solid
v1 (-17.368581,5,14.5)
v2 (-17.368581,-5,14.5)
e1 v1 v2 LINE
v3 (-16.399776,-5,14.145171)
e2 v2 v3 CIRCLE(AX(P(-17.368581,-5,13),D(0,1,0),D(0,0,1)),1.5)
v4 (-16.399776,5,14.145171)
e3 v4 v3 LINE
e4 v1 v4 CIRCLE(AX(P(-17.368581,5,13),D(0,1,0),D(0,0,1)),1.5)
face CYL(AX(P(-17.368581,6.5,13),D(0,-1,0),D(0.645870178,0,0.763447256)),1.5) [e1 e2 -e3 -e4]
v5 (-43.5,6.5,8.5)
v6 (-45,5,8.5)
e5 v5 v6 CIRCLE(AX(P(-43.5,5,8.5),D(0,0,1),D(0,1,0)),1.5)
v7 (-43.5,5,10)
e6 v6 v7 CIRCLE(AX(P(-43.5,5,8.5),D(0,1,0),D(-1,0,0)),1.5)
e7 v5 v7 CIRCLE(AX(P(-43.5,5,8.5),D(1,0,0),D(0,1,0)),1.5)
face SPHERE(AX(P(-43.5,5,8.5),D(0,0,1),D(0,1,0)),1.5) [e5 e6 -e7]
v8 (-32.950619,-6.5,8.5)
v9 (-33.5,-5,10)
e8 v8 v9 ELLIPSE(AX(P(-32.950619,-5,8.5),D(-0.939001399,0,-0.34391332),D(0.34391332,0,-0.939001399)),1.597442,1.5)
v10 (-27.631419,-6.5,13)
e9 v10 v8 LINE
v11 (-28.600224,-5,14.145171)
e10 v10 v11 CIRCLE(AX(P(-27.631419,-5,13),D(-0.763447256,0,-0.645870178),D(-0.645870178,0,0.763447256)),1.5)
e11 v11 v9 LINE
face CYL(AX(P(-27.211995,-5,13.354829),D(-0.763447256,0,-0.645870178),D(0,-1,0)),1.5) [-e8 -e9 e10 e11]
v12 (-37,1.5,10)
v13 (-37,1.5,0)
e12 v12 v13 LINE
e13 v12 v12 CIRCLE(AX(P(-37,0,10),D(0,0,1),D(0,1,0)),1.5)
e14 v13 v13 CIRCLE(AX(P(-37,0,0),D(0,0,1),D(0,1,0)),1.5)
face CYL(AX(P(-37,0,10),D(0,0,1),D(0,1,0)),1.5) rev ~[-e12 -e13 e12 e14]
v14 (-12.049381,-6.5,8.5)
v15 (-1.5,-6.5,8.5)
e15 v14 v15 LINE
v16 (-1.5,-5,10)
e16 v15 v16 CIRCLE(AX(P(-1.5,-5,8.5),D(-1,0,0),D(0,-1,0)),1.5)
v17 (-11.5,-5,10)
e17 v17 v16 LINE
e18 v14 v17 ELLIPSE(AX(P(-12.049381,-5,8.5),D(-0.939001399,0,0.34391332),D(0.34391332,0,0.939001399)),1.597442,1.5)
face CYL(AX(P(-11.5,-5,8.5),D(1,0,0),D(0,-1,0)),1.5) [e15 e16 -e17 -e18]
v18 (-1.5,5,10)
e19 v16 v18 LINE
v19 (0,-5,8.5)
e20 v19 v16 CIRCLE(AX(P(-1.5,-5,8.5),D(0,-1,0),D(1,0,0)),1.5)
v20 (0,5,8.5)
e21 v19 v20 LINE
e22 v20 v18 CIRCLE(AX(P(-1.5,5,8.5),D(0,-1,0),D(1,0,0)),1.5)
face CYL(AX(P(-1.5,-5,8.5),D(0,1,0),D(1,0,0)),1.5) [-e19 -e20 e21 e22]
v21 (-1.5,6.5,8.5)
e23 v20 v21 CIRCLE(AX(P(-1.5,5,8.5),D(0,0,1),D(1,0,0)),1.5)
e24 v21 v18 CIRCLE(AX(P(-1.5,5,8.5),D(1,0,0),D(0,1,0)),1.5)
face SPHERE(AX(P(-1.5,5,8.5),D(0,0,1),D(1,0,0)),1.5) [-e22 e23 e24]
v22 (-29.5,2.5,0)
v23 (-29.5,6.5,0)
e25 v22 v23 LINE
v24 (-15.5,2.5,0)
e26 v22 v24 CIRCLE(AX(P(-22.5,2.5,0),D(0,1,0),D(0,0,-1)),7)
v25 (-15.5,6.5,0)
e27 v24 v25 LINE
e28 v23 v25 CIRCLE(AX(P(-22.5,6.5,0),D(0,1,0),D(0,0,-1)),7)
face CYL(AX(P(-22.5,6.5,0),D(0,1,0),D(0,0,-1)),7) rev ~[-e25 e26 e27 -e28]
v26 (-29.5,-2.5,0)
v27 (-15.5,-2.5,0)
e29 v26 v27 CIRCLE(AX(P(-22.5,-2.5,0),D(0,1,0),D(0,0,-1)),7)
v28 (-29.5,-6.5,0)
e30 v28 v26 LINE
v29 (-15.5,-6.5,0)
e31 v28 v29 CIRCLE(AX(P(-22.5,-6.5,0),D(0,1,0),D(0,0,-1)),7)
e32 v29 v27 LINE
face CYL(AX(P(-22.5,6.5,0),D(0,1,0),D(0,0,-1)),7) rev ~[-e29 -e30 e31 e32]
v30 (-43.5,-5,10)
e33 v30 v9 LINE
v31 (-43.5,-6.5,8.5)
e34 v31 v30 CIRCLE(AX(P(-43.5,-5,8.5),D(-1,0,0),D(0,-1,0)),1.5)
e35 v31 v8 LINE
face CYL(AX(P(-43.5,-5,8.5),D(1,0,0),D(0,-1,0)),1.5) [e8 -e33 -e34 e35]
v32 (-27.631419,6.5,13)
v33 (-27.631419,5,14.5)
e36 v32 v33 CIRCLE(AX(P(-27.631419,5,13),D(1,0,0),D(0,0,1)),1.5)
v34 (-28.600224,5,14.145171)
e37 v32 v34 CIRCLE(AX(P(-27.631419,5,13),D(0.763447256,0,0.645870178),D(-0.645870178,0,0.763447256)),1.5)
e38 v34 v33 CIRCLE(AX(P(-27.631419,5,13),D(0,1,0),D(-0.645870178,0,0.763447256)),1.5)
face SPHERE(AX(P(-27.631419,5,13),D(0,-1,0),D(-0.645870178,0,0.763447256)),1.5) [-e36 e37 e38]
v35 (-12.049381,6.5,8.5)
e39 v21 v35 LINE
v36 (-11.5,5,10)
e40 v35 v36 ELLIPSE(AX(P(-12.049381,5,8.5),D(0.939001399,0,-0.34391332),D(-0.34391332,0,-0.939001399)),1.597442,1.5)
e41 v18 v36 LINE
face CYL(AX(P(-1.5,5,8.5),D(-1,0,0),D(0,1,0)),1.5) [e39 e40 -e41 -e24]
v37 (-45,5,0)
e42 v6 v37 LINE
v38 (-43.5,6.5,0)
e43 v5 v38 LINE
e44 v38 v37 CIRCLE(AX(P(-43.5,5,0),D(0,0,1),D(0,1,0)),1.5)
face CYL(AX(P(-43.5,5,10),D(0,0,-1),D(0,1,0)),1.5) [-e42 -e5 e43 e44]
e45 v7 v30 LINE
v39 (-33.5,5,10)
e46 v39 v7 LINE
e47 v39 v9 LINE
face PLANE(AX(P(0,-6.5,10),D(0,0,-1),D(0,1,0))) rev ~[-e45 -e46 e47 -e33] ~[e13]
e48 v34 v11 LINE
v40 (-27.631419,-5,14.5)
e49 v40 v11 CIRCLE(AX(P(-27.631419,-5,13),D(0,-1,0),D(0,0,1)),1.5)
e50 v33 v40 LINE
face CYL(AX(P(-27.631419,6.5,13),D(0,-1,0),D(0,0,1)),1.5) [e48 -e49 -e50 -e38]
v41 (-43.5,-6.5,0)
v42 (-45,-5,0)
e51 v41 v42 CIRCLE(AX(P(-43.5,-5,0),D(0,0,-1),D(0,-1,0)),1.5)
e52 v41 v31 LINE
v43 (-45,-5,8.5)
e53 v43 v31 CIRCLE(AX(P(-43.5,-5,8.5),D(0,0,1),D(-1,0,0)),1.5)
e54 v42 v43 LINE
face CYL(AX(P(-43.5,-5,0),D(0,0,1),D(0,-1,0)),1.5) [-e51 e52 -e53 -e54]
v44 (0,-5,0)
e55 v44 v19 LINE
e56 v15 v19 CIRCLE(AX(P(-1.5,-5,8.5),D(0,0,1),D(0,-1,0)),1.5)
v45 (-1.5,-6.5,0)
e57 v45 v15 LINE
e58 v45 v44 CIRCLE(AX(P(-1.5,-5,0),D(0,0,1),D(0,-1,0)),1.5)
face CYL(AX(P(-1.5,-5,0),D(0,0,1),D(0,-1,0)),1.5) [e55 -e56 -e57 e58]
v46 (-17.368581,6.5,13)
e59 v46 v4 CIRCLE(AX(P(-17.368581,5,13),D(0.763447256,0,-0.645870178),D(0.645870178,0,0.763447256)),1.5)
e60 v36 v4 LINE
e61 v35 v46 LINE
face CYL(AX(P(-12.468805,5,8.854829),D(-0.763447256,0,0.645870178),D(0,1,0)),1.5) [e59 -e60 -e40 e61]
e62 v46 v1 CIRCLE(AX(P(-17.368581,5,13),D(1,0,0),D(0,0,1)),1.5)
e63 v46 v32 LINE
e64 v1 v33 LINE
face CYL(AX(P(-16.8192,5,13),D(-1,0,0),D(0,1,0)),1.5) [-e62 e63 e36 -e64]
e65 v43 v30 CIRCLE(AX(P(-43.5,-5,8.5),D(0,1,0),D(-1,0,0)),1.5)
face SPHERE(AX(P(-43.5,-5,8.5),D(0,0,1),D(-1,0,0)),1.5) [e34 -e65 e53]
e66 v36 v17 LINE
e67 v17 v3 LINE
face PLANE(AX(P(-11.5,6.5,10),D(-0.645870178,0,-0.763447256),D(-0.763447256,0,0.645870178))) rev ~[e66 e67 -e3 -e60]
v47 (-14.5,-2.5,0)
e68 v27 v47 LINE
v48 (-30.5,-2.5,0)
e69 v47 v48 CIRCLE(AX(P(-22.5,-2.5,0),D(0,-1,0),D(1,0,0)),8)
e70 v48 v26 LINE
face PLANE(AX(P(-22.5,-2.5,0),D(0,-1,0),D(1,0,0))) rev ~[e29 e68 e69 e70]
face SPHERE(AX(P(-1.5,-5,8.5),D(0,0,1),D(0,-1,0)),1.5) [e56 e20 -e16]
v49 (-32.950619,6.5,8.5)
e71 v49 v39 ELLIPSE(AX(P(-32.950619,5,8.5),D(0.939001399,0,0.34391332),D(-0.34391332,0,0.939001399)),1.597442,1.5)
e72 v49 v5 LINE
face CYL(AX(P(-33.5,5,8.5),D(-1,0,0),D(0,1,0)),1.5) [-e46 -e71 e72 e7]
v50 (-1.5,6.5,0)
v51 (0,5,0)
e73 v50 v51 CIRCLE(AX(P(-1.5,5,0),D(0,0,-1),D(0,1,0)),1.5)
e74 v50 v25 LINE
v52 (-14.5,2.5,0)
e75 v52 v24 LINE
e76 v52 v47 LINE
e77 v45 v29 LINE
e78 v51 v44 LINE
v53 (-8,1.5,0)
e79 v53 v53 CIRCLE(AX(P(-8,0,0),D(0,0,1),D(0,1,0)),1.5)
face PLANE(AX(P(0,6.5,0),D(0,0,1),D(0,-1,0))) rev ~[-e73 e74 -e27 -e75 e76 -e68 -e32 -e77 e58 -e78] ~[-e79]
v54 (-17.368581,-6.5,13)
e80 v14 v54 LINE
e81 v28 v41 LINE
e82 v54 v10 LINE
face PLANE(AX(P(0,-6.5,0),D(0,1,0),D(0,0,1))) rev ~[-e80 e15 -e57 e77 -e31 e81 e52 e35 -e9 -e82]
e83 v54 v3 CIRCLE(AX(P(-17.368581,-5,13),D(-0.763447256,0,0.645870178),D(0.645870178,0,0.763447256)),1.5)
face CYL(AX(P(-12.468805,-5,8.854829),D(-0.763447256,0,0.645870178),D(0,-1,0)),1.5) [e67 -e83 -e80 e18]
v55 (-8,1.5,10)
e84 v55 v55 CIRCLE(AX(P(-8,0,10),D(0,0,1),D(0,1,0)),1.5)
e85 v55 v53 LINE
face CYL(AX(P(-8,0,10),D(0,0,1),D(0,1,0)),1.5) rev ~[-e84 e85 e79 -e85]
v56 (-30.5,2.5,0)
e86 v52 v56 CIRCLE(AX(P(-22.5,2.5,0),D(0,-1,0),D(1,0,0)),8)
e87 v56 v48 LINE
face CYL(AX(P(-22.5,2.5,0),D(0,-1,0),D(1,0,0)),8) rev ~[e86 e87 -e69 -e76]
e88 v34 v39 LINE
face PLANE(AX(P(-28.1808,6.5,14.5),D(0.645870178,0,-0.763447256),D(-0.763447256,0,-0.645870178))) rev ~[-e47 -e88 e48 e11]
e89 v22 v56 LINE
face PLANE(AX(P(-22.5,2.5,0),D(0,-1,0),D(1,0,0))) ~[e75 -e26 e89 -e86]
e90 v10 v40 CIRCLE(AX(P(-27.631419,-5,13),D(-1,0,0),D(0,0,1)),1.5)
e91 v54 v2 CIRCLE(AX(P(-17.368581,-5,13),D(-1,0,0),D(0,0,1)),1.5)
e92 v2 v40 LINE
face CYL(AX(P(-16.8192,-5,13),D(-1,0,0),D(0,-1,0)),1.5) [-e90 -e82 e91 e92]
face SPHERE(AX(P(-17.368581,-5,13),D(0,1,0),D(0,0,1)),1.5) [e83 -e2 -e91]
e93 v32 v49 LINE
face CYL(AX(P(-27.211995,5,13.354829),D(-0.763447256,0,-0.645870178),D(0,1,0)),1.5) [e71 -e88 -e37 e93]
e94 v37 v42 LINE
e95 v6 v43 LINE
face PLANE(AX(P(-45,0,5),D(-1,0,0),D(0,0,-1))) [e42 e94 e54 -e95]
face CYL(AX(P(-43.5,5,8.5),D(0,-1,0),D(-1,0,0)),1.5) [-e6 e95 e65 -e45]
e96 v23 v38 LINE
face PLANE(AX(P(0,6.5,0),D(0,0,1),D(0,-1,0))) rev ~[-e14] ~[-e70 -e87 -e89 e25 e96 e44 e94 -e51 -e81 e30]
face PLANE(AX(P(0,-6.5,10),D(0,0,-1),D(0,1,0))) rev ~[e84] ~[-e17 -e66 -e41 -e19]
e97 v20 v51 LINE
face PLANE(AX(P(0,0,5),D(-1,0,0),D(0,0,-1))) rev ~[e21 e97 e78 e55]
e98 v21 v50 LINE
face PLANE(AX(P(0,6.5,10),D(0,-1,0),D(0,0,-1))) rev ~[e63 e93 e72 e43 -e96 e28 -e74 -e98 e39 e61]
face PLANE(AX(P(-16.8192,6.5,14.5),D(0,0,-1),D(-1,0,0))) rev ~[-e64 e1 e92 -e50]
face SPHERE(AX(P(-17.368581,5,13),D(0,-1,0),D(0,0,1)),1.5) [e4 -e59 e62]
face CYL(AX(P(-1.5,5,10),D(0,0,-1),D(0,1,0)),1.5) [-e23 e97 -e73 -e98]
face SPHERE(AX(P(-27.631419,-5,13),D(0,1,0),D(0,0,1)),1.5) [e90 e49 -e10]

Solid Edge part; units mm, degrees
sketch "Sketch1" plane through (0, 0, 0) normal (1, 0, 0) x (0, 1, 0)
  line L0 (6.5, 10) -> (6.5, 0)
  line L1 (6.5, 0) -> (-6.5, 0)
  line L2 (-6.5, 0) -> (-6.5, 10)
  line L3 (-6.5, 10) -> (6.5, 10)
extrude "Protrusion1" add sketch "Sketch1" against normal blind 45
fillet "Redondeo_1" radius 1.5 4 edges at (0, -6.5, 5) (-45, -6.5, 5) (-45, 6.5, 5) (0, 6.5, 5)
sketch "Sketch2" plane through (-22.25, 6.5, 6.5) normal (0, 1, 0) x (0, 0, -1)
  circle A0 centre (6.5, 0.25) radius 7
extrude "Cutout1" cut sketch "Sketch2" against normal through all
sketch "Sketch3" plane through (-22.25, 6.5, 6.5) normal (0, 1, 0) x (-1, 0, 0)
  line L0 (-5.4308, 8) -> (5.9308, 8)
  line L1 (5.9308, 8) -> (11.25, 3.5)
  line L2 (11.25, 3.5) -> (-10.75, 3.5)
  line L3 (-10.75, 3.5) -> (-5.4308, 8)
extrude "ProtrusiónExtruida_2" add sketch "Sketch3" against normal blind 13
fillet "Redondeo_2" radius 1.5 17 edges at (-6.5, 6.5, 10) (-0.4393, 6.0607, 10) (0, 0, 10) (-0.4393, -6.0607, 10) (-6.5, -6.5, 10) (-38.5, 6.5, 10) (-45, 0, 10) (-44.5607, -6.0607, 10) (-38.5, -6.5, 10) (-14.1596, 6.5, 12.25) (-14.1596, -6.5, 12.25) (-16.8192, 0, 14.5) (-22.5, 6.5, 14.5) (-28.1808, 0, 14.5) (-22.5, -6.5, 14.5) (-30.8404, -6.5, 12.25) (-30.8404, 6.5, 12.25)
sketch "Sketch4" plane through (-7.25, 0, 10) normal (0, 0, 1) x (0, 1, 0)
  circle A0 centre (0, 0.75) radius 1.5
  circle A1 centre (0, 29.75) radius 1.5
  dimension "D1" = 8
  dimension "D2" = 8
extrude "Cutout2" cut sketch "Sketch4" against normal through all
sketch "Sketch5" plane through (0, 0, 0) normal (0, 0, 1) x (1, 0, 0)
  line L0 (-22.5, 2.5) -> (-14.5, 2.5)
  line L1 (-14.5, 2.5) -> (-14.5, -2.5)
  line L2 (-14.5, -2.5) -> (-22.5, -2.5)
  line L3 (-22.5, -2.5) -> (-22.5, 2.5)
revolve "RevolvedCutout1" cut sketch "Sketch5" angle 360 about axis through (-22.5, 8, 0) along (0, -1, 0)
